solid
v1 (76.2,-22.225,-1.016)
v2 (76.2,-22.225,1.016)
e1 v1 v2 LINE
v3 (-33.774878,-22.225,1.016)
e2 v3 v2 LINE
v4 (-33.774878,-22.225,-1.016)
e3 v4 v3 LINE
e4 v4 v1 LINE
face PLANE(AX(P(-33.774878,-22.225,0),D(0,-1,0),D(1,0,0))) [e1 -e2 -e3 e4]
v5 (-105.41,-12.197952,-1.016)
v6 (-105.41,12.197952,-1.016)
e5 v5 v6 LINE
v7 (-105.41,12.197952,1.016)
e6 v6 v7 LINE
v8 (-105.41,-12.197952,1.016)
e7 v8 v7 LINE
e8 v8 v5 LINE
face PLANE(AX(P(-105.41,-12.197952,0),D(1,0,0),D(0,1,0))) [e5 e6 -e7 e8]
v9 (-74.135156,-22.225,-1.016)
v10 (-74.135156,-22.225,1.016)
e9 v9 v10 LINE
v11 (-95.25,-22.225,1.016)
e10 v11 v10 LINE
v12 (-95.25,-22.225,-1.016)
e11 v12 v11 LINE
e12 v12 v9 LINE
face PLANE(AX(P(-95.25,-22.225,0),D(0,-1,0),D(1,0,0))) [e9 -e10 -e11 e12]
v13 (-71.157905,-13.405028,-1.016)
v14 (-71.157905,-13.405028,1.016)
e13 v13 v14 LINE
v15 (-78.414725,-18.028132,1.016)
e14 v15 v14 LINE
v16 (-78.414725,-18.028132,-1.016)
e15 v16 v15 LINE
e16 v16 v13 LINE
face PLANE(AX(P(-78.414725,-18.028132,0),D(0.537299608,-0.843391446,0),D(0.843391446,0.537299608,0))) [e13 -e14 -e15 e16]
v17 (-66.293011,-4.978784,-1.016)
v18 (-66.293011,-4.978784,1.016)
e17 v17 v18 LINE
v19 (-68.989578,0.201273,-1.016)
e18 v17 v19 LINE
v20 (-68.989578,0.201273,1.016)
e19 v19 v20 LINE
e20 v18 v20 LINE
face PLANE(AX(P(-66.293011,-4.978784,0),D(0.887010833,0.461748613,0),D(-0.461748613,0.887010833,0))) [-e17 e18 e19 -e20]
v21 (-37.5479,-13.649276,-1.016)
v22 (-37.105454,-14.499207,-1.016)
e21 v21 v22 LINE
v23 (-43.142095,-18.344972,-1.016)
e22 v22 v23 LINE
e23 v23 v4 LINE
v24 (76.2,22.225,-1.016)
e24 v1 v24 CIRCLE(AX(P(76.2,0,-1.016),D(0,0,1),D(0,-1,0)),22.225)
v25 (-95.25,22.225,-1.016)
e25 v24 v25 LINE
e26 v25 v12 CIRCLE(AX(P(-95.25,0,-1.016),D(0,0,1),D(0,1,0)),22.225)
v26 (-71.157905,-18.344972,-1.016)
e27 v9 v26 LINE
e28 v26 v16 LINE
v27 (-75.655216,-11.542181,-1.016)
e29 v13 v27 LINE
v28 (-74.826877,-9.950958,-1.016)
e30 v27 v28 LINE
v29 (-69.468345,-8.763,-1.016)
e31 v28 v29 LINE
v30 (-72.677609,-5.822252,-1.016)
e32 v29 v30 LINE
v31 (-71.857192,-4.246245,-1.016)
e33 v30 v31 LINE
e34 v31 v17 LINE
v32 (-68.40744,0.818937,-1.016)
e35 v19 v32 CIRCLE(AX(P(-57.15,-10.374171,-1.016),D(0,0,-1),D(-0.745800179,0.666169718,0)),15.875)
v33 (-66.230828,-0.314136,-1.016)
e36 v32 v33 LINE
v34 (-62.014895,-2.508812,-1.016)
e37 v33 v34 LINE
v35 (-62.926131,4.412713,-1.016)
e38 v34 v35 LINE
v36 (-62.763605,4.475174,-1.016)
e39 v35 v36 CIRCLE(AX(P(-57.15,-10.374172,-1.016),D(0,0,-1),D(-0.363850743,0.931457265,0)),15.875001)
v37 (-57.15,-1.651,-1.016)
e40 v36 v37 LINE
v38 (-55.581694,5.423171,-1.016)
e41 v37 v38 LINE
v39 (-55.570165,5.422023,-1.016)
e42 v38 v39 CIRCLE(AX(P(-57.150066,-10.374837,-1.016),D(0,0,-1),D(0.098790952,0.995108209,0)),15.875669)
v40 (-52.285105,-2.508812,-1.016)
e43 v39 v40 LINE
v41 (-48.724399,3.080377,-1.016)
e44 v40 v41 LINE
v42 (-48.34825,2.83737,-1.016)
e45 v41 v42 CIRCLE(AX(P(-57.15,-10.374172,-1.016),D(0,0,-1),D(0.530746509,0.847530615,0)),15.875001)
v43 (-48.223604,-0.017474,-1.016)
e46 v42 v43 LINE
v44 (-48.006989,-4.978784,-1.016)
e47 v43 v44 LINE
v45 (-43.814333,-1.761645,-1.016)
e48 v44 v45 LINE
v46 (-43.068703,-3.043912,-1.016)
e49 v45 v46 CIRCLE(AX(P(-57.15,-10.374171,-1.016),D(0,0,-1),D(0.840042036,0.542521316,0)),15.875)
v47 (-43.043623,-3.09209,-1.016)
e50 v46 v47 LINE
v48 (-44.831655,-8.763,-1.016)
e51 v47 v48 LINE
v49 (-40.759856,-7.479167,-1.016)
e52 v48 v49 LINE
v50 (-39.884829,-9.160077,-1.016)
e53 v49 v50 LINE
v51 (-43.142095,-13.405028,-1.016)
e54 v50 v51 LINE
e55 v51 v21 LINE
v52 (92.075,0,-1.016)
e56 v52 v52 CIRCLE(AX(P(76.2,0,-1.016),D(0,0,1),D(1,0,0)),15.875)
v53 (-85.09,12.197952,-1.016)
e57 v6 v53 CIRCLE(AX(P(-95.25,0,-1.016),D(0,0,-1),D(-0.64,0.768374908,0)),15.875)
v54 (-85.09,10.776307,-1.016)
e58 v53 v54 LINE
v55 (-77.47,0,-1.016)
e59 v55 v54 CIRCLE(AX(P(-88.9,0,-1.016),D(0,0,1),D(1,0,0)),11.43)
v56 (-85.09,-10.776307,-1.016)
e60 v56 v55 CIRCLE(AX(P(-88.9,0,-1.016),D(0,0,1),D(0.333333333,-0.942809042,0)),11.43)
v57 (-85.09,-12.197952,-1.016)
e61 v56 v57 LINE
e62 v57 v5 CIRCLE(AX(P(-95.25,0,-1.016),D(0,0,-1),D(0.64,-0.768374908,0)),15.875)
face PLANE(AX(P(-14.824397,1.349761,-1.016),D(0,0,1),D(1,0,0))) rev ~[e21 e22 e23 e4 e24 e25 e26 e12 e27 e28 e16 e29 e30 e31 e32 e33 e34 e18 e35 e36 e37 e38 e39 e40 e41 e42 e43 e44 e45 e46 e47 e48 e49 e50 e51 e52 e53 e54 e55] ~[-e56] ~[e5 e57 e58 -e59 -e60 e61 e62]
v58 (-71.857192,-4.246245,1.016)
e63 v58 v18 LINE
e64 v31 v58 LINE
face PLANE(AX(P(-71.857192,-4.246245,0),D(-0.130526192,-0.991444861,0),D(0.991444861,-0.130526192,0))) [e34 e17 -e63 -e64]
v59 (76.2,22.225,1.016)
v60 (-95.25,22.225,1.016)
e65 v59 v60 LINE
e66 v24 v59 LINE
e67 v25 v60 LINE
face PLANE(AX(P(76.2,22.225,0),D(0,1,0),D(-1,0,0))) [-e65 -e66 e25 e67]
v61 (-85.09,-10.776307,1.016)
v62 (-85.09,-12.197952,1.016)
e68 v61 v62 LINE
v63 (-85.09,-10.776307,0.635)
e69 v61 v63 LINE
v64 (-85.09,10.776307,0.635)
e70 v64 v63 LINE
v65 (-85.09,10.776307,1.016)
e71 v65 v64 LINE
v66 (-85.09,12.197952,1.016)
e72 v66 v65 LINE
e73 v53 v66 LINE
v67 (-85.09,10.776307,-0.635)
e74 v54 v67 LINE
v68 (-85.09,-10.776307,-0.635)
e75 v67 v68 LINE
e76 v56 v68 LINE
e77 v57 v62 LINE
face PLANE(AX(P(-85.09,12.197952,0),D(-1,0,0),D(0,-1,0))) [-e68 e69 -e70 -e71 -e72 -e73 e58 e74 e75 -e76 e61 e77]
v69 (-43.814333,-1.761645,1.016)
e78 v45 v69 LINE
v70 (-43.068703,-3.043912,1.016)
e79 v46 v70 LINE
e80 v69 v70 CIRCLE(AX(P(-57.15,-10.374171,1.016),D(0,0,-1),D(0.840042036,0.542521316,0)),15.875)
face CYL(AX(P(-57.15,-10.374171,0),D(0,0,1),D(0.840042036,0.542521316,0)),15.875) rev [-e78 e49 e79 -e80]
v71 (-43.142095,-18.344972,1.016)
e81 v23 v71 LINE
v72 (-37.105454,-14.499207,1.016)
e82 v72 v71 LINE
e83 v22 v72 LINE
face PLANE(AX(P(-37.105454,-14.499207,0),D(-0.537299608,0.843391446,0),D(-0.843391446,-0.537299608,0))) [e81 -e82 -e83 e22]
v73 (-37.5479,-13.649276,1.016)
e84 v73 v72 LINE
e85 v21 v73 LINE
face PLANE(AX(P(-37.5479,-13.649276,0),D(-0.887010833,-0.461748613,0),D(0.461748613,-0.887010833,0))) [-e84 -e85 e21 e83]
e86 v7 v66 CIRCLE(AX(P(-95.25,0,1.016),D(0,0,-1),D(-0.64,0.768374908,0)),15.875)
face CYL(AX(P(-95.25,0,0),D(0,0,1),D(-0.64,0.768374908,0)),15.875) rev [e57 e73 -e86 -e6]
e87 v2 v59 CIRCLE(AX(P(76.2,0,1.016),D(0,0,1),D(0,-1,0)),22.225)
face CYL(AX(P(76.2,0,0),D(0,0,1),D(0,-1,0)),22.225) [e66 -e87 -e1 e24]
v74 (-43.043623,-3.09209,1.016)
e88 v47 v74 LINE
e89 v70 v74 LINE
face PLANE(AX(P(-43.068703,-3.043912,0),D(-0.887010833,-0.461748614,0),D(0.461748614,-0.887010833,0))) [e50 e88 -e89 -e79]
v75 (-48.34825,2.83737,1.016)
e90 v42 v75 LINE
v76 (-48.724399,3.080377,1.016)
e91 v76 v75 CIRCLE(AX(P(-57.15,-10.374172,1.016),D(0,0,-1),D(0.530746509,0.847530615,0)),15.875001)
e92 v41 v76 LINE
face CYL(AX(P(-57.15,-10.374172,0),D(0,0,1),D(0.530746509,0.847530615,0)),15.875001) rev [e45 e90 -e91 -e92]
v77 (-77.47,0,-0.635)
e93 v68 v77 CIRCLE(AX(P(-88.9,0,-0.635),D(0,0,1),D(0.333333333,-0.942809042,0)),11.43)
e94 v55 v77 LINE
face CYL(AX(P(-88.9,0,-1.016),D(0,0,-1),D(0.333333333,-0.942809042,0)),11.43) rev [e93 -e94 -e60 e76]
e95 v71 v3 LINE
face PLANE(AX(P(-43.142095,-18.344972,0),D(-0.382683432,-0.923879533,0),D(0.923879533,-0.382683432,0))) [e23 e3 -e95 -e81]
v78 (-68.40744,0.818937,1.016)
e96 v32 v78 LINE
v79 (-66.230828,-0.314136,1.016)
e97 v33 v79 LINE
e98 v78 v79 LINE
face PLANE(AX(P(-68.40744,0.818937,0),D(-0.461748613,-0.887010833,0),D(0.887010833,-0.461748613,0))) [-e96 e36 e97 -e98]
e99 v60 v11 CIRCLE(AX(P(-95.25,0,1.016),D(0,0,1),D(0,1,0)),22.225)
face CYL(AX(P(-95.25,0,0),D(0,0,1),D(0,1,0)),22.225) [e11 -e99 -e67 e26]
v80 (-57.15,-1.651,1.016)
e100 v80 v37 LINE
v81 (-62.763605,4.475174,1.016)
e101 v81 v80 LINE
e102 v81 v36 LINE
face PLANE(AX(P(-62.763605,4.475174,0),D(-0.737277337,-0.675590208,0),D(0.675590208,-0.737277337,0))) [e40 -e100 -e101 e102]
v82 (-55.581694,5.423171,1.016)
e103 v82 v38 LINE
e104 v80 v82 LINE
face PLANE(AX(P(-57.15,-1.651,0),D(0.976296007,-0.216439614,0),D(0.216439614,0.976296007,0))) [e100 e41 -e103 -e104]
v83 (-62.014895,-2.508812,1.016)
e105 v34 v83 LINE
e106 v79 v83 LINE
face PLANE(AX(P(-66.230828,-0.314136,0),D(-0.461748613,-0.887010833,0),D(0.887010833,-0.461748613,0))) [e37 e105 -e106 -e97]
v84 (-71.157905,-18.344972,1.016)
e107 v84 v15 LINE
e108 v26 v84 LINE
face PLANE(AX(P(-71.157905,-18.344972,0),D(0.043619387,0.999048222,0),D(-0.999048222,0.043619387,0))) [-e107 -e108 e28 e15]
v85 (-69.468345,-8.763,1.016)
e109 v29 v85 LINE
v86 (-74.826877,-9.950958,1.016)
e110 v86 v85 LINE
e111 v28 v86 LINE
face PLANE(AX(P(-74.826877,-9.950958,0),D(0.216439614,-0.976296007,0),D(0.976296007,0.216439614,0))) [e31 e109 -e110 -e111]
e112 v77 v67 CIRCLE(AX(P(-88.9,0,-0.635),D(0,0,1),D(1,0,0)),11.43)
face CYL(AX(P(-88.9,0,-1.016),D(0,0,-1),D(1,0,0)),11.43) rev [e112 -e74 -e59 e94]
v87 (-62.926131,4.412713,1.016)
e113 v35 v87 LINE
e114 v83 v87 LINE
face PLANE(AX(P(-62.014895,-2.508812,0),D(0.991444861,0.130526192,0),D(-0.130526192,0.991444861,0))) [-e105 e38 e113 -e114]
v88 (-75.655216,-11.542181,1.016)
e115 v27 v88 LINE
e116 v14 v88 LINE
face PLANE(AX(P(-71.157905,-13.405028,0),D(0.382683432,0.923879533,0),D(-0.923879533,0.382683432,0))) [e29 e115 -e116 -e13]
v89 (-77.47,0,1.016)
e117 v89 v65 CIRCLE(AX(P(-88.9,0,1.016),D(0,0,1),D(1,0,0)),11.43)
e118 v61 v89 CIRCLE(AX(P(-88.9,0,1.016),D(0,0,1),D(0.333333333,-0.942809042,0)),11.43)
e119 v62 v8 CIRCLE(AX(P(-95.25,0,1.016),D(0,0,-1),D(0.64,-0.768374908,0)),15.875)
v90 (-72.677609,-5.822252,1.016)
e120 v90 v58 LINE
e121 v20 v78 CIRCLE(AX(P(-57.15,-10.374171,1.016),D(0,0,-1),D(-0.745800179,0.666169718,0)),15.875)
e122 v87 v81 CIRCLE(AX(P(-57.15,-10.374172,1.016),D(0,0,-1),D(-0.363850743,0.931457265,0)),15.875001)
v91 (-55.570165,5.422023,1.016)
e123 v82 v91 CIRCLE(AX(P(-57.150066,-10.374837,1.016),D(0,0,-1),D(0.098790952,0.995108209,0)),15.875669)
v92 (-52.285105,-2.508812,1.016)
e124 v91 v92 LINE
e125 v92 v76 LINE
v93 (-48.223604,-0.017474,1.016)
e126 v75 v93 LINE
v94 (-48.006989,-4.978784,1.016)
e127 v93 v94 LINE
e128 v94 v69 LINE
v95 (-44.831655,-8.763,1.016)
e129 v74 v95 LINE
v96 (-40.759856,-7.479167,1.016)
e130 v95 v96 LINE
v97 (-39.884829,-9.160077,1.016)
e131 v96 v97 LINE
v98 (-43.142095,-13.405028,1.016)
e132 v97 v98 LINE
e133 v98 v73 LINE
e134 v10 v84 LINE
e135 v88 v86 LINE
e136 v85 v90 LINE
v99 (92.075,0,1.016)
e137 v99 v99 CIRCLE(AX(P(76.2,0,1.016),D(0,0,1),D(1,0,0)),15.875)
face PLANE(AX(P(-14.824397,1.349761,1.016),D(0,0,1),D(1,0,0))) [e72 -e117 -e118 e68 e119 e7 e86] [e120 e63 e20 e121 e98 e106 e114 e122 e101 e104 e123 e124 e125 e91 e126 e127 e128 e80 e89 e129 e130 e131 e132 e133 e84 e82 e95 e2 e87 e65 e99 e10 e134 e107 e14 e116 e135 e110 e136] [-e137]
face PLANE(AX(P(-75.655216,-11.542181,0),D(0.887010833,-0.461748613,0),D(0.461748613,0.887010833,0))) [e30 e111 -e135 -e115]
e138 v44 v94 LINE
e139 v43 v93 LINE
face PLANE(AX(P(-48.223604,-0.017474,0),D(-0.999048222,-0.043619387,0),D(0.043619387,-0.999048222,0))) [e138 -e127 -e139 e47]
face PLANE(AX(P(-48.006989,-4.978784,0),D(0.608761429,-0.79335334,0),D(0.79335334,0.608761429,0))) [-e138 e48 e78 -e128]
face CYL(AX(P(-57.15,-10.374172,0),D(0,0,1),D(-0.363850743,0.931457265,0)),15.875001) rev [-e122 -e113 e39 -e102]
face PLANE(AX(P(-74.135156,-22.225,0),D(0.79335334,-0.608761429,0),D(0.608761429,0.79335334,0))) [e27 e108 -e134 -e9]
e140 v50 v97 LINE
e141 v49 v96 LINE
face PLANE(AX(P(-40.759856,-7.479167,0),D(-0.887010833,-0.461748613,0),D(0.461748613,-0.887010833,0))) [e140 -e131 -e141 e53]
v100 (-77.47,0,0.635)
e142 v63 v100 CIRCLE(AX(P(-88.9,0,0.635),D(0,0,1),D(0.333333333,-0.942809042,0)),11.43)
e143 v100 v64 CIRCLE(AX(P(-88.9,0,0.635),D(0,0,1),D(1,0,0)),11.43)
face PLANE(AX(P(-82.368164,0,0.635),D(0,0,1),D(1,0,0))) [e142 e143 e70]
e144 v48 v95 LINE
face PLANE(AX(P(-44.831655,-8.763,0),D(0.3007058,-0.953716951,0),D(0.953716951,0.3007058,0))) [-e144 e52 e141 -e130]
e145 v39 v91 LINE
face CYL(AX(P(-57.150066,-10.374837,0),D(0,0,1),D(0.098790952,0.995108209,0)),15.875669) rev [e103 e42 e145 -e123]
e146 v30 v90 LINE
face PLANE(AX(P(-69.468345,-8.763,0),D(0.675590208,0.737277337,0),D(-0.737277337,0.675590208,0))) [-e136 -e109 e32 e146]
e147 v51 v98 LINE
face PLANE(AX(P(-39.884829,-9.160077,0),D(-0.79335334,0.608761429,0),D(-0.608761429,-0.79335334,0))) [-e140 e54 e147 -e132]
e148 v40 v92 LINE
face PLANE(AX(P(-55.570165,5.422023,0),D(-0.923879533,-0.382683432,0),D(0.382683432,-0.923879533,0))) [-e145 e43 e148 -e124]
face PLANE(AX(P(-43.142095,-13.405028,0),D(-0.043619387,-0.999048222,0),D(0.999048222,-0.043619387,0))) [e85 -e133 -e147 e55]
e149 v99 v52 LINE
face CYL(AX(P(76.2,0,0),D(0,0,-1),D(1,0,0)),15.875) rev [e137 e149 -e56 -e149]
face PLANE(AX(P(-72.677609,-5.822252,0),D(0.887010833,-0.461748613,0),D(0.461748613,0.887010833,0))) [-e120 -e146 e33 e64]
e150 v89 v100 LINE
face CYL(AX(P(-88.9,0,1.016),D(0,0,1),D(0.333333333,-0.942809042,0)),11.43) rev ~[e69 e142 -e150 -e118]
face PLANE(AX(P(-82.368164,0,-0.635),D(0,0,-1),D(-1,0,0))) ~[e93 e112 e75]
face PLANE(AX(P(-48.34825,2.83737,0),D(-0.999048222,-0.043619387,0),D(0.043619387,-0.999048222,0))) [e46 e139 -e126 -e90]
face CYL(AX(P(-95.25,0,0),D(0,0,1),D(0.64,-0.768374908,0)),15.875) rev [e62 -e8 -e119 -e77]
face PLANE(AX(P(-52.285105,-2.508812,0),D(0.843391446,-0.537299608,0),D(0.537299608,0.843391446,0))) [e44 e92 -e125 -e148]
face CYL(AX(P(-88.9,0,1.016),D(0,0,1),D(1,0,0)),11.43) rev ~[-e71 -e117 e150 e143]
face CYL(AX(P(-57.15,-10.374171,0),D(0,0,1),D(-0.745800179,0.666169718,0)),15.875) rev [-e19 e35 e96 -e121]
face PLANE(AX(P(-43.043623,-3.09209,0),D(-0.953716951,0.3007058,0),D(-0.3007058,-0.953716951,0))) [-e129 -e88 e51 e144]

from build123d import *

# Parameters (mm, degrees)
F0_R     = 15.875
F1_DEPTH = 1.016
F3_DEPTH = 0.381


# Not quite as in the source:
# - a pattern or mirror of a feature is missing from the dataset's text; its kind, count and spacing are read off the source's solid
# - a feature names something its author has since deleted; it is built from what else it names


with BuildPart() as f1:
    # F0 (on Top) → F1 (new body, symmetric)
    with BuildSketch(Plane.XY):
        with BuildLine():
            Line((76.2, 22.225), (-95.25, 22.225))
            ThreePointArc((-95.25, 22.225), (-117.475, 0), (-95.25, -22.225))
            Line((-95.25, -22.225), (-81.2163393225, -22.225))
            Line((-81.2163393225, -22.225), (-80.4999828905, -20.8488920975))
            Line((-80.4999828905, -20.8488920975), (-81.8859980281, -17.8765730428))
            Line((-81.8859980281, -17.8765730428), (-80.3221061469, -17.944854037))
            Line((-80.3221061469, -17.944854037), (-81.0788131138, -9.2956538274))
            Line((-81.0788131138, -9.2956538274), (-79.6325889287, -9.8946994991))
            Line((-79.6325889287, -9.8946994991), (-77.3854601863, -1.5083008612))
            Line((-77.3854601863, -1.5083008612), (-76.231339678, -2.5658574615))
            Line((-76.231339678, -2.5658574615), (-71.2514121167, 4.5462161589))
            Line((-71.2514121167, 4.5462161589), (-70.5285992516, 3.1577055639))
            Line((-70.5285992516, 3.1577055639), (-63.4165256312, 8.1376331253))
            Line((-63.4165256312, 8.1376331253), (-63.2122023083, 6.5856434055))
            Line((-63.2122023083, 6.5856434055), (-54.8258036704, 8.832772148))
            Line((-54.8258036704, 8.832772148), (-55.1646142981, 7.3044961686))
            Line((-55.1646142981, 7.3044961686), (-46.5154140885, 6.5477892017))
            Line((-46.5154140885, 6.5477892017), (-47.3564931047, 5.2275596009))
            Line((-47.3564931047, 5.2275596009), (-39.4877125173, 1.5582869527))
            Line((-39.4877125173, 1.5582869527), (-40.7296133796, 0.6053429047))
            Line((-40.7296133796, 0.6053429047), (-34.5903434842, -5.5339269908))
            Line((-34.5903434842, -5.5339269908), (-36.0832746201, -6.0046463698))
            Line((-36.0832746201, -6.0046463698), (-32.4140019719, -13.8734269572))
            Line((-32.4140019719, -13.8734269572), (-33.9778938531, -13.805145963))
            Line((-33.9778938531, -13.805145963), (-33.273088024, -21.8611134529))
            Line((-33.273088024, -21.8611134529), (-33.0836606775, -22.225))
            Line((-33.0836606775, -22.225), (76.2, -22.225))
            ThreePointArc((76.2, -22.225), (98.425, 0), (76.2, 22.225))
        make_face()
        with BuildLine():
            ThreePointArc((-105.41, 12.1979516723), (-95.25, 15.875), (-85.09, 12.1979516723))
            Line((-85.09, 12.1979516723), (-85.09, -12.1979516723))
            ThreePointArc((-85.09, -12.1979516723), (-95.25, -15.875), (-105.41, -12.1979516723))
            Line((-105.41, -12.1979516723), (-105.41, 12.1979516723))
        make_face(mode=Mode.SUBTRACT)
        with Locations((76.2, 0)):
            Circle(F0_R, mode=Mode.SUBTRACT)
        Polygon((-80.4999828905, -20.8488920975), (-81.2163393225, -22.225), (-79.8582932371, -22.225), align=None)
        Polygon((-33.2412520763, -22.225), (-33.0836606775, -22.225), (-33.273088024, -21.8611134529), align=None)
        Polygon((-80.4999828905, -20.8488920975), (-79.8582932371, -22.225), (-77.6369016412, -22.225), (-74.1351559236, -22.225), (-71.1579054788, -18.3449716791), (-78.4147248097, -18.0281321046), (-79.3376725148, -18.6161146398), align=None)
        Polygon((-81.8859980281, -17.8765730428), (-80.4999828905, -20.8488920975), (-79.3376725148, -18.6161146398), (-80.2145068425, -19.1747197137), (-80.3221061469, -17.944854037), align=None)
        Polygon((-33.7748775265, -22.225), (-33.2412520763, -22.225), (-33.273088024, -21.8611134529), (-37.1054537581, -14.4992073738), (-43.1420945212, -18.3449716791), align=None)
        Polygon((-37.1054537581, -14.4992073738), (-33.273088024, -21.8611134529), (-33.9778938531, -13.805145963), (-35.8852751903, -13.7218678954), align=None)
        Polygon((-79.0178794125, -18.001797806), (-79.3376725148, -18.6161146398), (-78.4147248097, -18.0281321046), align=None)
        Polygon((-80.2145068425, -19.1747197137), (-79.3376725148, -18.6161146398), (-79.0178794125, -18.001797806), (-80.3221061469, -17.944854037), align=None)
        Polygon((-35.8852751903, -13.7218678954), (-33.9778938531, -13.805145963), (-34.0854931575, -12.5752802863), align=None)
        Polygon((-34.0854931575, -12.5752802863), (-33.9778938531, -13.805145963), (-32.4140019719, -13.8734269572), (-36.0832746201, -6.0046463698), (-37.9041095643, -6.5787534225), (-39.8848289883, -9.1600772324), (-37.5478999587, -13.6492761303), (-35.8852751903, -13.7218678954), align=None)
        Polygon((-37.5478999587, -13.6492761303), (-37.1054537581, -14.4992073738), (-35.8852751903, -13.7218678954), align=None)
        Polygon((-81.0788131138, -9.2956538274), (-80.3221061469, -17.944854037), (-79.0178794125, -18.001797806), (-75.6552159218, -11.5421813412), (-77.8687195378, -10.6253181231), (-79.9521174914, -11.0871963296), (-79.6325889287, -9.8946994991), align=None)
        Polygon((-79.0178794125, -18.001797806), (-78.4147248097, -18.0281321046), (-71.1579054788, -13.4050283209), (-75.6552159218, -11.5421813412), align=None)
        Polygon((-43.1420945212, -13.4050283209), (-37.5478999587, -13.6492761303), (-39.8848289883, -9.1600772324), align=None)
        Polygon((-77.8687195378, -10.6253181231), (-75.6552159218, -11.5421813412), (-74.8268774652, -9.950957971), align=None)
        Polygon((-37.9041095643, -6.5787534225), (-36.0832746201, -6.0046463698), (-36.6050237274, -4.8857517984), align=None)
        Polygon((-36.6050237274, -4.8857517984), (-36.0832746201, -6.0046463698), (-34.5903434842, -5.5339269908), (-40.7296133796, 0.6053429047), (-42.2442823639, -0.5569034849), (-43.0436234519, -3.0920895249), (-40.7598556276, -7.4791666976), (-37.9041095643, -6.5787534225), align=None)
        Polygon((-40.7598556276, -7.4791666976), (-39.8848289883, -9.1600772324), (-37.9041095643, -6.5787534225), align=None)
        Polygon((-77.8687195378, -10.6253181231), (-79.6325889287, -9.8946994991), (-79.9521174914, -11.0871963296), align=None)
        Polygon((-77.3854601863, -1.5083008612), (-79.6325889287, -9.8946994991), (-77.8687195378, -10.6253181231), (-74.8268774652, -9.950957971), (-72.6776090009, -5.822251665), (-74.8237309138, -3.855693253), (-76.9394562474, -3.5771527286), (-76.231339678, -2.5658574615), align=None)
        Polygon((-72.6776090009, -5.822251665), (-74.8268774652, -9.950957971), (-69.4683453434, -8.763), align=None)
        Polygon((-44.8316546566, -8.763), (-40.7598556276, -7.4791666976), (-43.0436234519, -3.0920895249), align=None)
        Polygon((-74.8237309138, -3.855693253), (-72.6776090009, -5.822251665), (-71.8571921171, -4.2462454947), align=None)
        Polygon((-42.2442823639, -0.5569034849), (-40.7296133796, 0.6053429047), (-41.6025816474, 1.4783111724), align=None)
        with BuildLine():
            Line((-41.6025816474, 1.4783111724), (-40.7296133796, 0.6053429047))
            Line((-40.7296133796, 0.6053429047), (-39.4877125173, 1.5582869527))
            Line((-39.4877125173, 1.5582869527), (-47.3564931047, 5.2275596009))
            Line((-47.3564931047, 5.2275596009), (-48.3823046954, 3.617357942))
            Line((-48.3823046954, 3.617357942), (-48.348249672, 2.8373696699))
            ThreePointArc((-48.348249672, 2.8373696699), (-45.8449546627, 0.7708533195), (-43.8143326805, -1.7616454653))
            Line((-43.8143326805, -1.7616454653), (-42.2442823639, -0.5569034849))
            Line((-42.2442823639, -0.5569034849), (-41.6025816474, 1.4783111724))
        make_face()
        with BuildLine():
            Line((-43.0687030233, -3.0439121166), (-43.0436234519, -3.0920895249))
            Line((-43.0436234519, -3.0920895249), (-42.2442823639, -0.5569034849))
            Line((-42.2442823639, -0.5569034849), (-43.8143326805, -1.7616454653))
            ThreePointArc((-43.8143326805, -1.7616454653), (-43.4265334283, -2.3940654467), (-43.0687030233, -3.0439121166))
        make_face()
        Polygon((-74.8237309138, -3.855693253), (-76.231339678, -2.5658574615), (-76.9394562474, -3.5771527286), align=None)
        with BuildLine():
            Line((-71.2514121167, 4.5462161589), (-76.231339678, -2.5658574615))
            Line((-76.231339678, -2.5658574615), (-74.8237309138, -3.855693253))
            Line((-74.8237309138, -3.855693253), (-71.8571921171, -4.2462454947))
            Line((-71.8571921171, -4.2462454947), (-71.2312969767, -3.0439121166))
            ThreePointArc((-71.2312969767, -3.0439121166), (-70.2116133855, -1.3514289323), (-68.9895778341, 0.2012729279))
            Line((-68.9895778341, 0.2012729279), (-69.6470295052, 1.4642258374))
            Line((-69.6470295052, 1.4642258374), (-71.5398945187, 2.4495889946))
            Line((-71.5398945187, 2.4495889946), (-70.5285992516, 3.1577055639))
            Line((-70.5285992516, 3.1577055639), (-71.2514121167, 4.5462161589))
        make_face()
        with BuildLine():
            Line((-71.2312969767, -3.0439121166), (-71.8571921171, -4.2462454947))
            Line((-71.8571921171, -4.2462454947), (-66.2930109602, -4.9787838411))
            Line((-66.2930109602, -4.9787838411), (-68.9895778341, 0.2012729279))
            ThreePointArc((-68.9895778341, 0.2012729279), (-70.2116133855, -1.3514289323), (-71.2312969767, -3.0439121166))
        make_face()
        Polygon((-48.3823046954, 3.617357942), (-47.3564931047, 5.2275596009), (-48.4753876761, 5.7493087082), align=None)
        with BuildLine():
            Line((-48.4753876761, 5.7493087082), (-47.3564931047, 5.2275596009))
            Line((-47.3564931047, 5.2275596009), (-46.5154140885, 6.5477892017))
            Line((-46.5154140885, 6.5477892017), (-55.1646142981, 7.3044961686))
            Line((-55.1646142981, 7.3044961686), (-55.5778404781, 5.4405533245))
            Line((-55.5778404781, 5.4405533245), (-55.5701648333, 5.4220226787))
            ThreePointArc((-55.5701648333, 5.4220226787), (-52.0121003071, 4.6464015983), (-48.7243991788, 3.0803771655))
            Line((-48.7243991788, 3.0803771655), (-48.3823046954, 3.617357942))
            Line((-48.3823046954, 3.617357942), (-48.4753876761, 5.7493087082))
        make_face()
        with BuildLine():
            Line((-48.0069890398, -4.9787838411), (-43.8143326805, -1.7616454653))
            ThreePointArc((-43.8143326805, -1.7616454653), (-45.8449546627, 0.7708533195), (-48.348249672, 2.8373696699))
            Line((-48.348249672, 2.8373696699), (-48.2236044906, -0.017474342))
            Line((-48.2236044906, -0.017474342), (-48.0069890398, -4.9787838411))
        make_face()
        Polygon((-69.6470295052, 1.4642258374), (-70.5285992516, 3.1577055639), (-71.5398945187, 2.4495889946), align=None)
        with BuildLine():
            Line((-63.4165256312, 8.1376331253), (-70.5285992516, 3.1577055639))
            Line((-70.5285992516, 3.1577055639), (-69.6470295052, 1.4642258374))
            Line((-69.6470295052, 1.4642258374), (-68.4074402589, 0.8189365196))
            ThreePointArc((-68.4074402589, 0.8189365196), (-65.8542771411, 2.9017913046), (-62.9261305575, 4.4127127279))
            Line((-62.9261305575, 4.4127127279), (-62.9630019017, 4.6927783921))
            Line((-62.9630019017, 4.6927783921), (-64.4046991388, 6.2661148428))
            Line((-64.4046991388, 6.2661148428), (-63.2122023083, 6.5856434055))
            Line((-63.2122023083, 6.5856434055), (-63.4165256312, 8.1376331253))
        make_face()
        with BuildLine():
            Line((-69.6470295052, 1.4642258374), (-68.9895778341, 0.2012729279))
            ThreePointArc((-68.9895778341, 0.2012729279), (-68.7026377194, 0.5139959287), (-68.4074402589, 0.8189365196))
            Line((-68.4074402589, 0.8189365196), (-69.6470295052, 1.4642258374))
        make_face()
        with BuildLine():
            Line((-48.348249672, 2.8373696699), (-48.3823046954, 3.617357942))
            Line((-48.3823046954, 3.617357942), (-48.7243991788, 3.0803771655))
            ThreePointArc((-48.7243991788, 3.0803771655), (-48.5354675075, 2.9601998346), (-48.348249672, 2.8373696699))
        make_face()
        with BuildLine():
            ThreePointArc((-62.9261305575, 4.4127127279), (-65.8542771411, 2.9017913046), (-68.4074402589, 0.8189365196))
            Line((-68.4074402589, 0.8189365196), (-66.2308278804, -0.3141361665))
            Line((-66.2308278804, -0.3141361665), (-62.0148945187, -2.5088121619))
            Line((-62.0148945187, -2.5088121619), (-62.9261305575, 4.4127127279))
        make_face()
        with BuildLine():
            Line((-56.3944799748, 7.412095473), (-55.1646142981, 7.3044961686))
            Line((-55.1646142981, 7.3044961686), (-54.8258036704, 8.832772148))
            Line((-54.8258036704, 8.832772148), (-63.2122023083, 6.5856434055))
            Line((-63.2122023083, 6.5856434055), (-62.9630019017, 4.6927783921))
            Line((-62.9630019017, 4.6927783921), (-62.7636045656, 4.4751743841))
            ThreePointArc((-62.7636045656, 4.4751743841), (-59.2274466598, 5.3643114334), (-55.5816939364, 5.4231714974))
            Line((-55.5816939364, 5.4231714974), (-55.5778404781, 5.4405533245))
            Line((-55.5778404781, 5.4405533245), (-56.3944799748, 7.412095473))
        make_face()
        Polygon((-55.5778404781, 5.4405533245), (-55.1646142981, 7.3044961686), (-56.3944799748, 7.412095473), align=None)
        with BuildLine():
            Line((-52.2851054813, -2.5088121619), (-48.7243991788, 3.0803771655))
            ThreePointArc((-48.7243991788, 3.0803771655), (-52.0121003071, 4.6464015983), (-55.5701648333, 5.4220226787))
            Line((-55.5701648333, 5.4220226787), (-52.2851054813, -2.5088121619))
        make_face()
        Polygon((-62.9630019017, 4.6927783921), (-63.2122023083, 6.5856434055), (-64.4046991388, 6.2661148428), align=None)
        with BuildLine():
            Line((-62.9630019017, 4.6927783921), (-62.9261305575, 4.4127127279))
            ThreePointArc((-62.9261305575, 4.4127127279), (-62.8449531963, 4.4441663787), (-62.7636045656, 4.4751743841))
            Line((-62.7636045656, 4.4751743841), (-62.9630019017, 4.6927783921))
        make_face()
        with BuildLine():
            Line((-55.5701648333, 5.4220226787), (-55.5778404781, 5.4405533245))
            Line((-55.5778404781, 5.4405533245), (-55.5816939364, 5.4231714974))
            ThreePointArc((-55.5816939364, 5.4231714974), (-55.57592928, 5.4225981398), (-55.5701648333, 5.4220226787))
        make_face()
        with BuildLine():
            ThreePointArc((-55.5816939364, 5.4231714974), (-59.2274466598, 5.3643114334), (-62.7636045656, 4.4751743841))
            Line((-62.7636045656, 4.4751743841), (-57.15, -1.651))
            Line((-57.15, -1.651), (-55.5816939364, 5.4231714974))
        make_face()
    extrude(amount=F1_DEPTH, both=True)

    # F2 (on face) → F3 (cut)
    with BuildSketch(Plane.XY.offset(1.016)):
        with BuildLine():
            ThreePointArc((-85.09, -10.7763073453), (-79.56744408, -6.5991135768), (-77.47, 0))
            ThreePointArc((-77.47, 0), (-79.56744408, 6.5991135768), (-85.09, 10.7763073453))
            Line((-85.09, 10.7763073453), (-85.09, -10.7763073453))
        make_face()
    f3 = extrude(amount=-F3_DEPTH, mode=Mode.SUBTRACT)

    # F3_copies: F3 across plane
    add(f3.mirror(Plane(origin=(0, 0, 0), x_dir=(-1, 0, 0), z_dir=(0, 0, -1))), mode=Mode.SUBTRACT)


solid = f1.part
